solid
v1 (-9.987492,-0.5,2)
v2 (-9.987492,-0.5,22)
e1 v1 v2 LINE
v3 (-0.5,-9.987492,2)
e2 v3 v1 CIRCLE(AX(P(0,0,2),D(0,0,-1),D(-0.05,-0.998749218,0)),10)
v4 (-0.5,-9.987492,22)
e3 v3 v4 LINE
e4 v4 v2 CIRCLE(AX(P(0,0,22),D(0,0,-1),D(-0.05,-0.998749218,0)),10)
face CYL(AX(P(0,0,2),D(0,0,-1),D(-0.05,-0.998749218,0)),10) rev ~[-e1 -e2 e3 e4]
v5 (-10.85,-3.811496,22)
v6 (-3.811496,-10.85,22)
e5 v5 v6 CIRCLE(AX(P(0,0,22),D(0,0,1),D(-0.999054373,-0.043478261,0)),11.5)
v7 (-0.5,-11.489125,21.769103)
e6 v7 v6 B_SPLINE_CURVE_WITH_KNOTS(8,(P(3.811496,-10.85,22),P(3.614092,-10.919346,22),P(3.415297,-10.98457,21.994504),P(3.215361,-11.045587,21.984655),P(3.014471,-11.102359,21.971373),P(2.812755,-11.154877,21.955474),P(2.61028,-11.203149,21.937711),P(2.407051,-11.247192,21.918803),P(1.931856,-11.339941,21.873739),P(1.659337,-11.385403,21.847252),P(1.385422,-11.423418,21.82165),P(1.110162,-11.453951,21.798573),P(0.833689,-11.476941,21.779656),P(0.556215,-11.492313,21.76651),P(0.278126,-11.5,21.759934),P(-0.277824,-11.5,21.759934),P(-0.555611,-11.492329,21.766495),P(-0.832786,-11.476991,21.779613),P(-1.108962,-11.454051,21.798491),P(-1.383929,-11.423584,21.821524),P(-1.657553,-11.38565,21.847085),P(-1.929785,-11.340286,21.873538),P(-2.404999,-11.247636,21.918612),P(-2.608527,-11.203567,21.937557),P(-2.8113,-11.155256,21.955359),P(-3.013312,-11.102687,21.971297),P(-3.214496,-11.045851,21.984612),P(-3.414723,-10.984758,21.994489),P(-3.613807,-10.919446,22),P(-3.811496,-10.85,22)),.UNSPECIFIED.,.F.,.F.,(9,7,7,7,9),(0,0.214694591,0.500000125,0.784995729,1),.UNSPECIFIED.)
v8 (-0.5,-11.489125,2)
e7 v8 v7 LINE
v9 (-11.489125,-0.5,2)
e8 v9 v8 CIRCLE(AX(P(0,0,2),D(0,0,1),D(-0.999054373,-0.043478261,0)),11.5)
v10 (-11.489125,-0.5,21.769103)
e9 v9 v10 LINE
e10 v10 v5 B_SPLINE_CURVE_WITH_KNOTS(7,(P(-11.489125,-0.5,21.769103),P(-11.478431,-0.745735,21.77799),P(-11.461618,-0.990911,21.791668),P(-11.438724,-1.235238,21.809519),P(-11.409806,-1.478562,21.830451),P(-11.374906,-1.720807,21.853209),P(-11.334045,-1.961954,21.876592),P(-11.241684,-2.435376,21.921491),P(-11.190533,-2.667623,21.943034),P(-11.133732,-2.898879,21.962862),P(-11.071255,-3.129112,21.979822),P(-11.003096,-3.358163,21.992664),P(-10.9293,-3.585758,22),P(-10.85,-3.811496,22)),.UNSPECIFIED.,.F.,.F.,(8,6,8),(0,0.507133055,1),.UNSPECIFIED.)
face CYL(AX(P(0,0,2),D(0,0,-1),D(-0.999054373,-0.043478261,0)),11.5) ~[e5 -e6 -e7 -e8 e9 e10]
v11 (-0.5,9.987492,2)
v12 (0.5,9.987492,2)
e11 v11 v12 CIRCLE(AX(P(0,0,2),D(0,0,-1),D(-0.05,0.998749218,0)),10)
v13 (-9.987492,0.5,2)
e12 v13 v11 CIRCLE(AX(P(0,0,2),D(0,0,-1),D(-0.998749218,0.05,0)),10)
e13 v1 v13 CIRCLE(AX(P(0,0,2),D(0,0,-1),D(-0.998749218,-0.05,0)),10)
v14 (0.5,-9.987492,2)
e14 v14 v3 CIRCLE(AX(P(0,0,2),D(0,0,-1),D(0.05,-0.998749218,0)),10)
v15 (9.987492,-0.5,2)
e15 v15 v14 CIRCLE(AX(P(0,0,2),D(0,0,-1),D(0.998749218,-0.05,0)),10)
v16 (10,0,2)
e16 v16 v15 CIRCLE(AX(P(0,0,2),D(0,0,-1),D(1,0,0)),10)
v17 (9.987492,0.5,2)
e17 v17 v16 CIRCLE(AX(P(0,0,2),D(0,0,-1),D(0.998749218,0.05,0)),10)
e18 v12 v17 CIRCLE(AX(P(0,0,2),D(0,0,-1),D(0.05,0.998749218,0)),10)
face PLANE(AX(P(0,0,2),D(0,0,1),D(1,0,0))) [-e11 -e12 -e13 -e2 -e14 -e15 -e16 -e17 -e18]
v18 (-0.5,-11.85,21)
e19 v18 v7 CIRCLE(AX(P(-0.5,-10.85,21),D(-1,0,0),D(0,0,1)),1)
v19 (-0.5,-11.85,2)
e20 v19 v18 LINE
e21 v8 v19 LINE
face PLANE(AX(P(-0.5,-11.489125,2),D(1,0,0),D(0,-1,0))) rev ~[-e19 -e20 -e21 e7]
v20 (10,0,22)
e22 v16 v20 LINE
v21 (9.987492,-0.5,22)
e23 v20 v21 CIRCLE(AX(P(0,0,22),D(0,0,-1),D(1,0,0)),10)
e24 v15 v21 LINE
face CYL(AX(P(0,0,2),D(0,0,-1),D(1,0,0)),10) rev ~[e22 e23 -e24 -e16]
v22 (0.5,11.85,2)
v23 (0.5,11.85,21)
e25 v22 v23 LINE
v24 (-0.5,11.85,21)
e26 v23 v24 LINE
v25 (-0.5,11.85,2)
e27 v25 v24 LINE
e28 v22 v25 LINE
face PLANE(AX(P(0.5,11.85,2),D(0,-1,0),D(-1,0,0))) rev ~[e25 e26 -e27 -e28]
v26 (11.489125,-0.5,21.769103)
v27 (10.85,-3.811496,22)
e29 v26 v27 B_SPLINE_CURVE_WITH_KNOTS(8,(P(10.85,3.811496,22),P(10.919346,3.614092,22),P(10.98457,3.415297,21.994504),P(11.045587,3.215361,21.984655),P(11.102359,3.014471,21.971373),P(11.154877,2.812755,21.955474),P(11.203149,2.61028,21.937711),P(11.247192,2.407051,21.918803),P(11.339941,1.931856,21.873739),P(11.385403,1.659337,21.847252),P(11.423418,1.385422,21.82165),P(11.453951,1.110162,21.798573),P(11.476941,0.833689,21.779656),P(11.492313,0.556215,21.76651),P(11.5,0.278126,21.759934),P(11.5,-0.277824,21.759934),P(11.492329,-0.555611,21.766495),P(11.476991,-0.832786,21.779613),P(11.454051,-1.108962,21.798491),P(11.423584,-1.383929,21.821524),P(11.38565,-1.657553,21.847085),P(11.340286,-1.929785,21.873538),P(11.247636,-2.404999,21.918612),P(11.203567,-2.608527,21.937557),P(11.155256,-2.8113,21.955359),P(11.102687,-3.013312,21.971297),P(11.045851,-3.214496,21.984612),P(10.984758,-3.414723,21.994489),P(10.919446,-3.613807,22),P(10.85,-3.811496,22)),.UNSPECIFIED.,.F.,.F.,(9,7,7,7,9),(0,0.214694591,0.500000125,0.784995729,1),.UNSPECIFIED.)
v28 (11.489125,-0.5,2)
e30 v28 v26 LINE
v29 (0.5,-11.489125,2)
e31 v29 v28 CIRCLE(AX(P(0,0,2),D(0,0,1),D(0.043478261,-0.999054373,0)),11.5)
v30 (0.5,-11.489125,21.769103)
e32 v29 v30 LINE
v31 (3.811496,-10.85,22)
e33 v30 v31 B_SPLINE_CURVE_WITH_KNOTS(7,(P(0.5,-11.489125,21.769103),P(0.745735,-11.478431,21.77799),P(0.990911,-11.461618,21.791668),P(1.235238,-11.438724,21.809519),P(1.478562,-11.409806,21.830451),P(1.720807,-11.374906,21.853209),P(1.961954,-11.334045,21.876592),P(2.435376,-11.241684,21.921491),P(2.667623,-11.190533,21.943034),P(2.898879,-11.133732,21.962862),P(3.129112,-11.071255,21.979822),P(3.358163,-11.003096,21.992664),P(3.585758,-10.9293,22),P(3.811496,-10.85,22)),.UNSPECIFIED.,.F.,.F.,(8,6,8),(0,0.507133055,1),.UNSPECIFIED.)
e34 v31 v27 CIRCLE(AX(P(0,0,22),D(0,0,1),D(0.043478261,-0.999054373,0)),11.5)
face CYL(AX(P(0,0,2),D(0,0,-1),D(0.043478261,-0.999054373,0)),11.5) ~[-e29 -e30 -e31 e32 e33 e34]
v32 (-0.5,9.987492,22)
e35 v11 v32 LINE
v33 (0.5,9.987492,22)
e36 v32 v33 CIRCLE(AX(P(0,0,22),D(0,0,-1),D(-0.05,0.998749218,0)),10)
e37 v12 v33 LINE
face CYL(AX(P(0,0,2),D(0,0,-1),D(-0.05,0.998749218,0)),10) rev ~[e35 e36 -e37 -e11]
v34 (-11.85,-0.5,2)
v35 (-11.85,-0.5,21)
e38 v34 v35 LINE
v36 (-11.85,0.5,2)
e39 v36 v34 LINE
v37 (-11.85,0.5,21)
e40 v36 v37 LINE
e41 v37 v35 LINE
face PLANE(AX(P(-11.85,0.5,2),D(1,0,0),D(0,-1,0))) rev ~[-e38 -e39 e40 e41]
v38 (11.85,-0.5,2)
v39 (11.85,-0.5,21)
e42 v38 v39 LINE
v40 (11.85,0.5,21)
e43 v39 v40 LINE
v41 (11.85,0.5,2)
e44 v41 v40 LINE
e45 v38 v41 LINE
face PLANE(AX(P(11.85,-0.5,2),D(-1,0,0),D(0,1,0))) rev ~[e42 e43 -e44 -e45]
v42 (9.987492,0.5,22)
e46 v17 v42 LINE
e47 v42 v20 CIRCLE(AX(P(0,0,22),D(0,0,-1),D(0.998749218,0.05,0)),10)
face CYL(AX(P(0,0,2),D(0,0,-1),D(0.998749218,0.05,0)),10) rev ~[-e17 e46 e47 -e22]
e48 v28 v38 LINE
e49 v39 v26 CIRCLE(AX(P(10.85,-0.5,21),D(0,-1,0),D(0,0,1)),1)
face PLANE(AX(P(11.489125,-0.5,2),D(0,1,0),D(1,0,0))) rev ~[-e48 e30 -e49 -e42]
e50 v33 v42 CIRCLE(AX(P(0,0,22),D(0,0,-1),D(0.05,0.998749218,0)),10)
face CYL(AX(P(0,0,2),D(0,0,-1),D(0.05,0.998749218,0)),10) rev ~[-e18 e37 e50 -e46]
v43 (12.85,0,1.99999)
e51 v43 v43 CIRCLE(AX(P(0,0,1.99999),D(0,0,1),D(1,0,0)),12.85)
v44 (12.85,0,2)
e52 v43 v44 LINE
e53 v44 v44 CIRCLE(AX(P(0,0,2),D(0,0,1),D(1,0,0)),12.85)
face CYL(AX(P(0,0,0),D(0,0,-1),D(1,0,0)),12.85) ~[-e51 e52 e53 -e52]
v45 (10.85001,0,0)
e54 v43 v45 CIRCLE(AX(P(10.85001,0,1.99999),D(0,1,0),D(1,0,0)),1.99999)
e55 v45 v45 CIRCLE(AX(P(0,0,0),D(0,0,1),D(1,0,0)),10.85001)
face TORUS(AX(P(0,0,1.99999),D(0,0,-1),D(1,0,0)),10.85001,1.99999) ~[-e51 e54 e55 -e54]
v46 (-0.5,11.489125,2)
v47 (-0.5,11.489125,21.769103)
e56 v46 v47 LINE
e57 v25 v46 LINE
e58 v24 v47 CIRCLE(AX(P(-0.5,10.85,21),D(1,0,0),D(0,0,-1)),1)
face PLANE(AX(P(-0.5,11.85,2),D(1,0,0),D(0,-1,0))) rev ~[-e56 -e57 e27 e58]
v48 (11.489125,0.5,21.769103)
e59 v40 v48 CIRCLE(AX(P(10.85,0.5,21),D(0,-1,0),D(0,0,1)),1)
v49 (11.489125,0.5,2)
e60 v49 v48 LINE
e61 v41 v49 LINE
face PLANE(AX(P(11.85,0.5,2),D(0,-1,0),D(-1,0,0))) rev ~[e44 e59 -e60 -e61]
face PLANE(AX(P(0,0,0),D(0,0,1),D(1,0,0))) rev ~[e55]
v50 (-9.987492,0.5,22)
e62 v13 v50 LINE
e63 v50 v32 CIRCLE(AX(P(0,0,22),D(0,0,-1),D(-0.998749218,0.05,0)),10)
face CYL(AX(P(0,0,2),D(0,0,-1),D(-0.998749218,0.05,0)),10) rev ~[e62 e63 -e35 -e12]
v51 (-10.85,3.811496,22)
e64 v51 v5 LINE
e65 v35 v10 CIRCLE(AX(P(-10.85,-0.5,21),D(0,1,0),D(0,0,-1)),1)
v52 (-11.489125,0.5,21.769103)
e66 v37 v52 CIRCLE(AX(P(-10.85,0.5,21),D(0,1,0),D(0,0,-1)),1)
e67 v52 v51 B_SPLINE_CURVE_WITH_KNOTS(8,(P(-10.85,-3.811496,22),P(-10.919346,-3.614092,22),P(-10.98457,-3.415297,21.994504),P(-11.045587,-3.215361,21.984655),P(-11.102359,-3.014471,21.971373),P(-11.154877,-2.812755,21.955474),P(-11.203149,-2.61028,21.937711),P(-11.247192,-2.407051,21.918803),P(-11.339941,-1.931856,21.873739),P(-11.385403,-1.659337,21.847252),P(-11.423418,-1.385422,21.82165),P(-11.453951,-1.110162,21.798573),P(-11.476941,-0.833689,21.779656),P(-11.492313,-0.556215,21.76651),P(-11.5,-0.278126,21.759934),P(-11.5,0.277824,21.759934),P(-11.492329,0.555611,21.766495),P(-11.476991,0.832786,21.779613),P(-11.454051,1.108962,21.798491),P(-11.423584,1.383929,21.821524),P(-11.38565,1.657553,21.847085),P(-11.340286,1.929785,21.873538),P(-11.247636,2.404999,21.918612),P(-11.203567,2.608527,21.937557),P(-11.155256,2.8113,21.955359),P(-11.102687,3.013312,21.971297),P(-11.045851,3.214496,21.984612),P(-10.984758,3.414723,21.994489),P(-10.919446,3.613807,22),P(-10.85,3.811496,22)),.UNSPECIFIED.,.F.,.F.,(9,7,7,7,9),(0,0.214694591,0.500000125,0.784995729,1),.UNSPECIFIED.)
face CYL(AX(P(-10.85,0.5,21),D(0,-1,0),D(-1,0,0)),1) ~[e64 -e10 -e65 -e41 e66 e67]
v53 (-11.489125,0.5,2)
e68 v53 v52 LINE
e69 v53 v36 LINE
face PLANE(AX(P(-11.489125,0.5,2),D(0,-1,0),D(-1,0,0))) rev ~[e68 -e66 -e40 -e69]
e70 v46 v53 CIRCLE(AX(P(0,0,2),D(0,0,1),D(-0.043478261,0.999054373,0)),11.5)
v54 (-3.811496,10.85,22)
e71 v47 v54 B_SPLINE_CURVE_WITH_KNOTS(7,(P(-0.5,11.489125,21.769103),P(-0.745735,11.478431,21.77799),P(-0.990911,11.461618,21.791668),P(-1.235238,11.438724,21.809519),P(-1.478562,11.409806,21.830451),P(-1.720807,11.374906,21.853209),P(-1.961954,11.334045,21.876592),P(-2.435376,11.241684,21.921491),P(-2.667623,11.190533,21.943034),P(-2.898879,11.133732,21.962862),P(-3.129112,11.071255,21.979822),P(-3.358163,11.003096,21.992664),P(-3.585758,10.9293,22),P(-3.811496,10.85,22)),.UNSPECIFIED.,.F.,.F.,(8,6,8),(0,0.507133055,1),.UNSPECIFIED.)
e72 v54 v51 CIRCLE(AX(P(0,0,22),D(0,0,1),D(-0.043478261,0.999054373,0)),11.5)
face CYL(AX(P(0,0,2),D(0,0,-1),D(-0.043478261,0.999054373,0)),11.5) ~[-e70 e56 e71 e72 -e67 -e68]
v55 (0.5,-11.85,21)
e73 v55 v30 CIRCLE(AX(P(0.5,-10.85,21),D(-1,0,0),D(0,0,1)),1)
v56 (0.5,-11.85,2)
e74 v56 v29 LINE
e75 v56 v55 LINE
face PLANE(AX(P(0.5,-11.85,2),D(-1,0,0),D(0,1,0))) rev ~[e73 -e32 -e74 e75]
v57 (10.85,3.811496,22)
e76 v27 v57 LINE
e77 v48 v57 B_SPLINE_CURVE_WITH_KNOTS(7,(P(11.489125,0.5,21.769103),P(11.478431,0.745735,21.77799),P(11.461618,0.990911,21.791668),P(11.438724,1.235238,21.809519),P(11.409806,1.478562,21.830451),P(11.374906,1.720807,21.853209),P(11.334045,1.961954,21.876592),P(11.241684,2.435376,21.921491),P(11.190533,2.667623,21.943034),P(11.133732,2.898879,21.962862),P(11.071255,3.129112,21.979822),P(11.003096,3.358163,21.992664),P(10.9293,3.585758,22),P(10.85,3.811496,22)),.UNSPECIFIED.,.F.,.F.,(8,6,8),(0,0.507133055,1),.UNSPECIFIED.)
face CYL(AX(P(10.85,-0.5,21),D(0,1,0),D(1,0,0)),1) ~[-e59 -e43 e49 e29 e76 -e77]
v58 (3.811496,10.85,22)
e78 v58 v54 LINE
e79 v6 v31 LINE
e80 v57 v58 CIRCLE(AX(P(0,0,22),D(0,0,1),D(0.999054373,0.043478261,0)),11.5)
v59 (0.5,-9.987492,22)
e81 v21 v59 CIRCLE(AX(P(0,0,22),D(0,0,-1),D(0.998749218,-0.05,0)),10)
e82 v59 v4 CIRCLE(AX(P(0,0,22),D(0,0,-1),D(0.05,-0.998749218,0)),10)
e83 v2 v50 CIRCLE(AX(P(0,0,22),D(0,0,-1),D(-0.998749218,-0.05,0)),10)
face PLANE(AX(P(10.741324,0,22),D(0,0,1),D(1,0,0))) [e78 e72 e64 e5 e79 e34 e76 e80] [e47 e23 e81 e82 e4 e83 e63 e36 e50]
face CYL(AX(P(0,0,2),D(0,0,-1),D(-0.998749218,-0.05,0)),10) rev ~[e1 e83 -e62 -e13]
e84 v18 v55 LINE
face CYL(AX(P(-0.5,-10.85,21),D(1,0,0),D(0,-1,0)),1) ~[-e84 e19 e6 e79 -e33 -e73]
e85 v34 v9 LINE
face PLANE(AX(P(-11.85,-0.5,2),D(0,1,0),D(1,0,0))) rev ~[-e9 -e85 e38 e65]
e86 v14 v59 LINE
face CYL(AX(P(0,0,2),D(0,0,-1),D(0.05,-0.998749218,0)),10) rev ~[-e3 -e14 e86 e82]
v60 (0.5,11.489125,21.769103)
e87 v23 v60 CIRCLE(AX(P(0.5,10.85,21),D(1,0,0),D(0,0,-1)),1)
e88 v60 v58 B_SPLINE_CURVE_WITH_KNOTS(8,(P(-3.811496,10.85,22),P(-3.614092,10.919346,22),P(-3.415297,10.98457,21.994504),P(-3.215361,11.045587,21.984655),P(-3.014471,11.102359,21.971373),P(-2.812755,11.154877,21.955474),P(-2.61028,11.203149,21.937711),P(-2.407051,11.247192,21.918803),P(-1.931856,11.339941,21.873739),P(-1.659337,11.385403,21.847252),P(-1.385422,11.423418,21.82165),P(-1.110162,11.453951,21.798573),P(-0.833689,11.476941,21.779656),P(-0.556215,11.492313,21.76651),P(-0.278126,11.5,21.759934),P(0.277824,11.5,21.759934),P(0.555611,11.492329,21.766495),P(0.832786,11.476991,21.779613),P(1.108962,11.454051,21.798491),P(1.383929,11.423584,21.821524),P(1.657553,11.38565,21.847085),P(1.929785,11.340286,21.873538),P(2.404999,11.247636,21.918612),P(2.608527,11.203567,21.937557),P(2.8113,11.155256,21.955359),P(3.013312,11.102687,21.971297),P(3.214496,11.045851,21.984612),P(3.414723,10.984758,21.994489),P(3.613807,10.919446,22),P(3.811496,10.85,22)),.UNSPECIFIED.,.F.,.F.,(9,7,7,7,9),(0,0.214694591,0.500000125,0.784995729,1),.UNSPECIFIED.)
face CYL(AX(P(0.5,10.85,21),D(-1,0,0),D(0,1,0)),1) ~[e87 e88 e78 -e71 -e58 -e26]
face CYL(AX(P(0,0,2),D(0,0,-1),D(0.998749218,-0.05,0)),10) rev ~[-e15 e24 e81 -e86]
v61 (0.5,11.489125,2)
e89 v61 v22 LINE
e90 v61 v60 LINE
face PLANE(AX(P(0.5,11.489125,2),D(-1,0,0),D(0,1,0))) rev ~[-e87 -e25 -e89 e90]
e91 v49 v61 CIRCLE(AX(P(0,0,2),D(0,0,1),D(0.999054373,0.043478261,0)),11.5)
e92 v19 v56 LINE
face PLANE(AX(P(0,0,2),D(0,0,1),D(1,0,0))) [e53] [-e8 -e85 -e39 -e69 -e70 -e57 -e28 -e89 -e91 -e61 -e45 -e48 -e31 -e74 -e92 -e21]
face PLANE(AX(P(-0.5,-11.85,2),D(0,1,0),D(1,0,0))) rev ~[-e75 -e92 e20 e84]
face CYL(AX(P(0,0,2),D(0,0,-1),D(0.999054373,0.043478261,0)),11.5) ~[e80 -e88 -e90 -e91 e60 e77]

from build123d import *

# Parameters (mm, degrees)
F0_R     = 12.85
F1_DEPTH = 2
F3_DEPTH = 20
F4_R     = 1
F5_R     = 1.99999


# Not quite as in the source:
# - a fillet or chamfer is up to 0.001 mm smaller than in the source, because OpenCascade refuses the exact size


with BuildPart() as f1:
    # F0 (on Top) → F1 (new body)
    with BuildSketch(Plane.XY):
        Circle(F0_R)
    extrude(amount=F1_DEPTH)

    # F2 (on face) → F3 (join)
    with BuildSketch(Plane.XY.offset(2)):
        with BuildLine():
            ThreePointArc((11.4891252931, -0.5), (11.4972810018, -0.2500591226), (11.5, 0))
            ThreePointArc((11.5, 0), (11.4972810018, 0.2500591226), (11.4891252931, 0.5))
            Line((11.4891252931, 0.5), (9.9874921777, 0.5))
            ThreePointArc((9.9874921777, 0.5), (9.9968725554, 0.2500782106), (10, 0))
            ThreePointArc((10, 0), (9.9968725554, -0.2500782106), (9.9874921777, -0.5))
            Line((9.9874921777, -0.5), (11.4891252931, -0.5))
        make_face()
        with BuildLine():
            ThreePointArc((11.4891252931, 0.5), (11.4972810018, 0.2500591226), (11.5, 0))
            ThreePointArc((11.5, 0), (11.4972810018, -0.2500591226), (11.4891252931, -0.5))
            Line((11.4891252931, -0.5), (11.85, -0.5))
            Line((11.85, -0.5), (11.85, 0.5))
            Line((11.85, 0.5), (11.4891252931, 0.5))
        make_face()
        with BuildLine():
            Line((9.9874921777, 0.5), (11.4891252931, 0.5))
            ThreePointArc((11.4891252931, 0.5), (8.1317279836, 8.1317279836), (0.5, 11.4891252931))
            Line((0.5, 11.4891252931), (0.5, 9.9874921777))
            ThreePointArc((0.5, 9.9874921777), (7.0710678119, 7.0710678119), (9.9874921777, 0.5))
        make_face()
        with BuildLine():
            ThreePointArc((0.5, -11.4891252931), (8.1317279836, -8.1317279836), (11.4891252931, -0.5))
            Line((11.4891252931, -0.5), (9.9874921777, -0.5))
            ThreePointArc((9.9874921777, -0.5), (7.0710678119, -7.0710678119), (0.5, -9.9874921777))
            Line((0.5, -9.9874921777), (0.5, -11.4891252931))
        make_face()
        with BuildLine():
            Line((0.5, 9.9874921777), (0.5, 11.4891252931))
            ThreePointArc((0.5, 11.4891252931), (0, 11.5), (-0.5, 11.4891252931))
            Line((-0.5, 11.4891252931), (-0.5, 9.9874921777))
            ThreePointArc((-0.5, 9.9874921777), (0, 10), (0.5, 9.9874921777))
        make_face()
        with BuildLine():
            ThreePointArc((-0.5, 11.4891252931), (0, 11.5), (0.5, 11.4891252931))
            Line((0.5, 11.4891252931), (0.5, 11.85))
            Line((0.5, 11.85), (-0.5, 11.85))
            Line((-0.5, 11.85), (-0.5, 11.4891252931))
        make_face()
        with BuildLine():
            Line((0.5, -11.85), (0.5, -11.4891252931))
            ThreePointArc((0.5, -11.4891252931), (0, -11.5), (-0.5, -11.4891252931))
            Line((-0.5, -11.4891252931), (-0.5, -11.85))
            Line((-0.5, -11.85), (0.5, -11.85))
        make_face()
        with BuildLine():
            ThreePointArc((-0.5, -11.4891252931), (0, -11.5), (0.5, -11.4891252931))
            Line((0.5, -11.4891252931), (0.5, -9.9874921777))
            ThreePointArc((0.5, -9.9874921777), (0, -10), (-0.5, -9.9874921777))
            Line((-0.5, -9.9874921777), (-0.5, -11.4891252931))
        make_face()
        with BuildLine():
            Line((-0.5, 9.9874921777), (-0.5, 11.4891252931))
            ThreePointArc((-0.5, 11.4891252931), (-8.1317279836, 8.1317279836), (-11.4891252931, 0.5))
            Line((-11.4891252931, 0.5), (-9.9874921777, 0.5))
            ThreePointArc((-9.9874921777, 0.5), (-7.0710678119, 7.0710678119), (-0.5, 9.9874921777))
        make_face()
        with BuildLine():
            ThreePointArc((-11.4891252931, -0.5), (-8.1317279836, -8.1317279836), (-0.5, -11.4891252931))
            Line((-0.5, -11.4891252931), (-0.5, -9.9874921777))
            ThreePointArc((-0.5, -9.9874921777), (-7.0710678119, -7.0710678119), (-9.9874921777, -0.5))
            Line((-9.9874921777, -0.5), (-11.4891252931, -0.5))
        make_face()
        with BuildLine():
            Line((-9.9874921777, 0.5), (-11.4891252931, 0.5))
            ThreePointArc((-11.4891252931, 0.5), (-11.5, 0), (-11.4891252931, -0.5))
            Line((-11.4891252931, -0.5), (-9.9874921777, -0.5))
            ThreePointArc((-9.9874921777, -0.5), (-10, 0), (-9.9874921777, 0.5))
        make_face()
        with BuildLine():
            ThreePointArc((-11.4891252931, -0.5), (-11.5, 0), (-11.4891252931, 0.5))
            Line((-11.4891252931, 0.5), (-11.85, 0.5))
            Line((-11.85, 0.5), (-11.85, -0.5))
            Line((-11.85, -0.5), (-11.4891252931, -0.5))
        make_face()
    extrude(amount=F3_DEPTH)

    # F4
    f4_edges = [f1.edges().sort_by_distance(p)[0] for p in [
        (11.85, 0, 22),
        (0, 11.85, 22),
        (-11.85, 0, 22),
        (0, -11.85, 22),
    ]]
    fillet(f4_edges, radius=F4_R)

    # F5 (radius 2 in the source; OpenCascade refuses exactly that, so slightly less here)
    f5_edges = [f1.edges().sort_by_distance(p)[0] for p in [
        (-12.85, 0, 0),
    ]]
    fillet(f5_edges, radius=F5_R)


solid = f1.part
